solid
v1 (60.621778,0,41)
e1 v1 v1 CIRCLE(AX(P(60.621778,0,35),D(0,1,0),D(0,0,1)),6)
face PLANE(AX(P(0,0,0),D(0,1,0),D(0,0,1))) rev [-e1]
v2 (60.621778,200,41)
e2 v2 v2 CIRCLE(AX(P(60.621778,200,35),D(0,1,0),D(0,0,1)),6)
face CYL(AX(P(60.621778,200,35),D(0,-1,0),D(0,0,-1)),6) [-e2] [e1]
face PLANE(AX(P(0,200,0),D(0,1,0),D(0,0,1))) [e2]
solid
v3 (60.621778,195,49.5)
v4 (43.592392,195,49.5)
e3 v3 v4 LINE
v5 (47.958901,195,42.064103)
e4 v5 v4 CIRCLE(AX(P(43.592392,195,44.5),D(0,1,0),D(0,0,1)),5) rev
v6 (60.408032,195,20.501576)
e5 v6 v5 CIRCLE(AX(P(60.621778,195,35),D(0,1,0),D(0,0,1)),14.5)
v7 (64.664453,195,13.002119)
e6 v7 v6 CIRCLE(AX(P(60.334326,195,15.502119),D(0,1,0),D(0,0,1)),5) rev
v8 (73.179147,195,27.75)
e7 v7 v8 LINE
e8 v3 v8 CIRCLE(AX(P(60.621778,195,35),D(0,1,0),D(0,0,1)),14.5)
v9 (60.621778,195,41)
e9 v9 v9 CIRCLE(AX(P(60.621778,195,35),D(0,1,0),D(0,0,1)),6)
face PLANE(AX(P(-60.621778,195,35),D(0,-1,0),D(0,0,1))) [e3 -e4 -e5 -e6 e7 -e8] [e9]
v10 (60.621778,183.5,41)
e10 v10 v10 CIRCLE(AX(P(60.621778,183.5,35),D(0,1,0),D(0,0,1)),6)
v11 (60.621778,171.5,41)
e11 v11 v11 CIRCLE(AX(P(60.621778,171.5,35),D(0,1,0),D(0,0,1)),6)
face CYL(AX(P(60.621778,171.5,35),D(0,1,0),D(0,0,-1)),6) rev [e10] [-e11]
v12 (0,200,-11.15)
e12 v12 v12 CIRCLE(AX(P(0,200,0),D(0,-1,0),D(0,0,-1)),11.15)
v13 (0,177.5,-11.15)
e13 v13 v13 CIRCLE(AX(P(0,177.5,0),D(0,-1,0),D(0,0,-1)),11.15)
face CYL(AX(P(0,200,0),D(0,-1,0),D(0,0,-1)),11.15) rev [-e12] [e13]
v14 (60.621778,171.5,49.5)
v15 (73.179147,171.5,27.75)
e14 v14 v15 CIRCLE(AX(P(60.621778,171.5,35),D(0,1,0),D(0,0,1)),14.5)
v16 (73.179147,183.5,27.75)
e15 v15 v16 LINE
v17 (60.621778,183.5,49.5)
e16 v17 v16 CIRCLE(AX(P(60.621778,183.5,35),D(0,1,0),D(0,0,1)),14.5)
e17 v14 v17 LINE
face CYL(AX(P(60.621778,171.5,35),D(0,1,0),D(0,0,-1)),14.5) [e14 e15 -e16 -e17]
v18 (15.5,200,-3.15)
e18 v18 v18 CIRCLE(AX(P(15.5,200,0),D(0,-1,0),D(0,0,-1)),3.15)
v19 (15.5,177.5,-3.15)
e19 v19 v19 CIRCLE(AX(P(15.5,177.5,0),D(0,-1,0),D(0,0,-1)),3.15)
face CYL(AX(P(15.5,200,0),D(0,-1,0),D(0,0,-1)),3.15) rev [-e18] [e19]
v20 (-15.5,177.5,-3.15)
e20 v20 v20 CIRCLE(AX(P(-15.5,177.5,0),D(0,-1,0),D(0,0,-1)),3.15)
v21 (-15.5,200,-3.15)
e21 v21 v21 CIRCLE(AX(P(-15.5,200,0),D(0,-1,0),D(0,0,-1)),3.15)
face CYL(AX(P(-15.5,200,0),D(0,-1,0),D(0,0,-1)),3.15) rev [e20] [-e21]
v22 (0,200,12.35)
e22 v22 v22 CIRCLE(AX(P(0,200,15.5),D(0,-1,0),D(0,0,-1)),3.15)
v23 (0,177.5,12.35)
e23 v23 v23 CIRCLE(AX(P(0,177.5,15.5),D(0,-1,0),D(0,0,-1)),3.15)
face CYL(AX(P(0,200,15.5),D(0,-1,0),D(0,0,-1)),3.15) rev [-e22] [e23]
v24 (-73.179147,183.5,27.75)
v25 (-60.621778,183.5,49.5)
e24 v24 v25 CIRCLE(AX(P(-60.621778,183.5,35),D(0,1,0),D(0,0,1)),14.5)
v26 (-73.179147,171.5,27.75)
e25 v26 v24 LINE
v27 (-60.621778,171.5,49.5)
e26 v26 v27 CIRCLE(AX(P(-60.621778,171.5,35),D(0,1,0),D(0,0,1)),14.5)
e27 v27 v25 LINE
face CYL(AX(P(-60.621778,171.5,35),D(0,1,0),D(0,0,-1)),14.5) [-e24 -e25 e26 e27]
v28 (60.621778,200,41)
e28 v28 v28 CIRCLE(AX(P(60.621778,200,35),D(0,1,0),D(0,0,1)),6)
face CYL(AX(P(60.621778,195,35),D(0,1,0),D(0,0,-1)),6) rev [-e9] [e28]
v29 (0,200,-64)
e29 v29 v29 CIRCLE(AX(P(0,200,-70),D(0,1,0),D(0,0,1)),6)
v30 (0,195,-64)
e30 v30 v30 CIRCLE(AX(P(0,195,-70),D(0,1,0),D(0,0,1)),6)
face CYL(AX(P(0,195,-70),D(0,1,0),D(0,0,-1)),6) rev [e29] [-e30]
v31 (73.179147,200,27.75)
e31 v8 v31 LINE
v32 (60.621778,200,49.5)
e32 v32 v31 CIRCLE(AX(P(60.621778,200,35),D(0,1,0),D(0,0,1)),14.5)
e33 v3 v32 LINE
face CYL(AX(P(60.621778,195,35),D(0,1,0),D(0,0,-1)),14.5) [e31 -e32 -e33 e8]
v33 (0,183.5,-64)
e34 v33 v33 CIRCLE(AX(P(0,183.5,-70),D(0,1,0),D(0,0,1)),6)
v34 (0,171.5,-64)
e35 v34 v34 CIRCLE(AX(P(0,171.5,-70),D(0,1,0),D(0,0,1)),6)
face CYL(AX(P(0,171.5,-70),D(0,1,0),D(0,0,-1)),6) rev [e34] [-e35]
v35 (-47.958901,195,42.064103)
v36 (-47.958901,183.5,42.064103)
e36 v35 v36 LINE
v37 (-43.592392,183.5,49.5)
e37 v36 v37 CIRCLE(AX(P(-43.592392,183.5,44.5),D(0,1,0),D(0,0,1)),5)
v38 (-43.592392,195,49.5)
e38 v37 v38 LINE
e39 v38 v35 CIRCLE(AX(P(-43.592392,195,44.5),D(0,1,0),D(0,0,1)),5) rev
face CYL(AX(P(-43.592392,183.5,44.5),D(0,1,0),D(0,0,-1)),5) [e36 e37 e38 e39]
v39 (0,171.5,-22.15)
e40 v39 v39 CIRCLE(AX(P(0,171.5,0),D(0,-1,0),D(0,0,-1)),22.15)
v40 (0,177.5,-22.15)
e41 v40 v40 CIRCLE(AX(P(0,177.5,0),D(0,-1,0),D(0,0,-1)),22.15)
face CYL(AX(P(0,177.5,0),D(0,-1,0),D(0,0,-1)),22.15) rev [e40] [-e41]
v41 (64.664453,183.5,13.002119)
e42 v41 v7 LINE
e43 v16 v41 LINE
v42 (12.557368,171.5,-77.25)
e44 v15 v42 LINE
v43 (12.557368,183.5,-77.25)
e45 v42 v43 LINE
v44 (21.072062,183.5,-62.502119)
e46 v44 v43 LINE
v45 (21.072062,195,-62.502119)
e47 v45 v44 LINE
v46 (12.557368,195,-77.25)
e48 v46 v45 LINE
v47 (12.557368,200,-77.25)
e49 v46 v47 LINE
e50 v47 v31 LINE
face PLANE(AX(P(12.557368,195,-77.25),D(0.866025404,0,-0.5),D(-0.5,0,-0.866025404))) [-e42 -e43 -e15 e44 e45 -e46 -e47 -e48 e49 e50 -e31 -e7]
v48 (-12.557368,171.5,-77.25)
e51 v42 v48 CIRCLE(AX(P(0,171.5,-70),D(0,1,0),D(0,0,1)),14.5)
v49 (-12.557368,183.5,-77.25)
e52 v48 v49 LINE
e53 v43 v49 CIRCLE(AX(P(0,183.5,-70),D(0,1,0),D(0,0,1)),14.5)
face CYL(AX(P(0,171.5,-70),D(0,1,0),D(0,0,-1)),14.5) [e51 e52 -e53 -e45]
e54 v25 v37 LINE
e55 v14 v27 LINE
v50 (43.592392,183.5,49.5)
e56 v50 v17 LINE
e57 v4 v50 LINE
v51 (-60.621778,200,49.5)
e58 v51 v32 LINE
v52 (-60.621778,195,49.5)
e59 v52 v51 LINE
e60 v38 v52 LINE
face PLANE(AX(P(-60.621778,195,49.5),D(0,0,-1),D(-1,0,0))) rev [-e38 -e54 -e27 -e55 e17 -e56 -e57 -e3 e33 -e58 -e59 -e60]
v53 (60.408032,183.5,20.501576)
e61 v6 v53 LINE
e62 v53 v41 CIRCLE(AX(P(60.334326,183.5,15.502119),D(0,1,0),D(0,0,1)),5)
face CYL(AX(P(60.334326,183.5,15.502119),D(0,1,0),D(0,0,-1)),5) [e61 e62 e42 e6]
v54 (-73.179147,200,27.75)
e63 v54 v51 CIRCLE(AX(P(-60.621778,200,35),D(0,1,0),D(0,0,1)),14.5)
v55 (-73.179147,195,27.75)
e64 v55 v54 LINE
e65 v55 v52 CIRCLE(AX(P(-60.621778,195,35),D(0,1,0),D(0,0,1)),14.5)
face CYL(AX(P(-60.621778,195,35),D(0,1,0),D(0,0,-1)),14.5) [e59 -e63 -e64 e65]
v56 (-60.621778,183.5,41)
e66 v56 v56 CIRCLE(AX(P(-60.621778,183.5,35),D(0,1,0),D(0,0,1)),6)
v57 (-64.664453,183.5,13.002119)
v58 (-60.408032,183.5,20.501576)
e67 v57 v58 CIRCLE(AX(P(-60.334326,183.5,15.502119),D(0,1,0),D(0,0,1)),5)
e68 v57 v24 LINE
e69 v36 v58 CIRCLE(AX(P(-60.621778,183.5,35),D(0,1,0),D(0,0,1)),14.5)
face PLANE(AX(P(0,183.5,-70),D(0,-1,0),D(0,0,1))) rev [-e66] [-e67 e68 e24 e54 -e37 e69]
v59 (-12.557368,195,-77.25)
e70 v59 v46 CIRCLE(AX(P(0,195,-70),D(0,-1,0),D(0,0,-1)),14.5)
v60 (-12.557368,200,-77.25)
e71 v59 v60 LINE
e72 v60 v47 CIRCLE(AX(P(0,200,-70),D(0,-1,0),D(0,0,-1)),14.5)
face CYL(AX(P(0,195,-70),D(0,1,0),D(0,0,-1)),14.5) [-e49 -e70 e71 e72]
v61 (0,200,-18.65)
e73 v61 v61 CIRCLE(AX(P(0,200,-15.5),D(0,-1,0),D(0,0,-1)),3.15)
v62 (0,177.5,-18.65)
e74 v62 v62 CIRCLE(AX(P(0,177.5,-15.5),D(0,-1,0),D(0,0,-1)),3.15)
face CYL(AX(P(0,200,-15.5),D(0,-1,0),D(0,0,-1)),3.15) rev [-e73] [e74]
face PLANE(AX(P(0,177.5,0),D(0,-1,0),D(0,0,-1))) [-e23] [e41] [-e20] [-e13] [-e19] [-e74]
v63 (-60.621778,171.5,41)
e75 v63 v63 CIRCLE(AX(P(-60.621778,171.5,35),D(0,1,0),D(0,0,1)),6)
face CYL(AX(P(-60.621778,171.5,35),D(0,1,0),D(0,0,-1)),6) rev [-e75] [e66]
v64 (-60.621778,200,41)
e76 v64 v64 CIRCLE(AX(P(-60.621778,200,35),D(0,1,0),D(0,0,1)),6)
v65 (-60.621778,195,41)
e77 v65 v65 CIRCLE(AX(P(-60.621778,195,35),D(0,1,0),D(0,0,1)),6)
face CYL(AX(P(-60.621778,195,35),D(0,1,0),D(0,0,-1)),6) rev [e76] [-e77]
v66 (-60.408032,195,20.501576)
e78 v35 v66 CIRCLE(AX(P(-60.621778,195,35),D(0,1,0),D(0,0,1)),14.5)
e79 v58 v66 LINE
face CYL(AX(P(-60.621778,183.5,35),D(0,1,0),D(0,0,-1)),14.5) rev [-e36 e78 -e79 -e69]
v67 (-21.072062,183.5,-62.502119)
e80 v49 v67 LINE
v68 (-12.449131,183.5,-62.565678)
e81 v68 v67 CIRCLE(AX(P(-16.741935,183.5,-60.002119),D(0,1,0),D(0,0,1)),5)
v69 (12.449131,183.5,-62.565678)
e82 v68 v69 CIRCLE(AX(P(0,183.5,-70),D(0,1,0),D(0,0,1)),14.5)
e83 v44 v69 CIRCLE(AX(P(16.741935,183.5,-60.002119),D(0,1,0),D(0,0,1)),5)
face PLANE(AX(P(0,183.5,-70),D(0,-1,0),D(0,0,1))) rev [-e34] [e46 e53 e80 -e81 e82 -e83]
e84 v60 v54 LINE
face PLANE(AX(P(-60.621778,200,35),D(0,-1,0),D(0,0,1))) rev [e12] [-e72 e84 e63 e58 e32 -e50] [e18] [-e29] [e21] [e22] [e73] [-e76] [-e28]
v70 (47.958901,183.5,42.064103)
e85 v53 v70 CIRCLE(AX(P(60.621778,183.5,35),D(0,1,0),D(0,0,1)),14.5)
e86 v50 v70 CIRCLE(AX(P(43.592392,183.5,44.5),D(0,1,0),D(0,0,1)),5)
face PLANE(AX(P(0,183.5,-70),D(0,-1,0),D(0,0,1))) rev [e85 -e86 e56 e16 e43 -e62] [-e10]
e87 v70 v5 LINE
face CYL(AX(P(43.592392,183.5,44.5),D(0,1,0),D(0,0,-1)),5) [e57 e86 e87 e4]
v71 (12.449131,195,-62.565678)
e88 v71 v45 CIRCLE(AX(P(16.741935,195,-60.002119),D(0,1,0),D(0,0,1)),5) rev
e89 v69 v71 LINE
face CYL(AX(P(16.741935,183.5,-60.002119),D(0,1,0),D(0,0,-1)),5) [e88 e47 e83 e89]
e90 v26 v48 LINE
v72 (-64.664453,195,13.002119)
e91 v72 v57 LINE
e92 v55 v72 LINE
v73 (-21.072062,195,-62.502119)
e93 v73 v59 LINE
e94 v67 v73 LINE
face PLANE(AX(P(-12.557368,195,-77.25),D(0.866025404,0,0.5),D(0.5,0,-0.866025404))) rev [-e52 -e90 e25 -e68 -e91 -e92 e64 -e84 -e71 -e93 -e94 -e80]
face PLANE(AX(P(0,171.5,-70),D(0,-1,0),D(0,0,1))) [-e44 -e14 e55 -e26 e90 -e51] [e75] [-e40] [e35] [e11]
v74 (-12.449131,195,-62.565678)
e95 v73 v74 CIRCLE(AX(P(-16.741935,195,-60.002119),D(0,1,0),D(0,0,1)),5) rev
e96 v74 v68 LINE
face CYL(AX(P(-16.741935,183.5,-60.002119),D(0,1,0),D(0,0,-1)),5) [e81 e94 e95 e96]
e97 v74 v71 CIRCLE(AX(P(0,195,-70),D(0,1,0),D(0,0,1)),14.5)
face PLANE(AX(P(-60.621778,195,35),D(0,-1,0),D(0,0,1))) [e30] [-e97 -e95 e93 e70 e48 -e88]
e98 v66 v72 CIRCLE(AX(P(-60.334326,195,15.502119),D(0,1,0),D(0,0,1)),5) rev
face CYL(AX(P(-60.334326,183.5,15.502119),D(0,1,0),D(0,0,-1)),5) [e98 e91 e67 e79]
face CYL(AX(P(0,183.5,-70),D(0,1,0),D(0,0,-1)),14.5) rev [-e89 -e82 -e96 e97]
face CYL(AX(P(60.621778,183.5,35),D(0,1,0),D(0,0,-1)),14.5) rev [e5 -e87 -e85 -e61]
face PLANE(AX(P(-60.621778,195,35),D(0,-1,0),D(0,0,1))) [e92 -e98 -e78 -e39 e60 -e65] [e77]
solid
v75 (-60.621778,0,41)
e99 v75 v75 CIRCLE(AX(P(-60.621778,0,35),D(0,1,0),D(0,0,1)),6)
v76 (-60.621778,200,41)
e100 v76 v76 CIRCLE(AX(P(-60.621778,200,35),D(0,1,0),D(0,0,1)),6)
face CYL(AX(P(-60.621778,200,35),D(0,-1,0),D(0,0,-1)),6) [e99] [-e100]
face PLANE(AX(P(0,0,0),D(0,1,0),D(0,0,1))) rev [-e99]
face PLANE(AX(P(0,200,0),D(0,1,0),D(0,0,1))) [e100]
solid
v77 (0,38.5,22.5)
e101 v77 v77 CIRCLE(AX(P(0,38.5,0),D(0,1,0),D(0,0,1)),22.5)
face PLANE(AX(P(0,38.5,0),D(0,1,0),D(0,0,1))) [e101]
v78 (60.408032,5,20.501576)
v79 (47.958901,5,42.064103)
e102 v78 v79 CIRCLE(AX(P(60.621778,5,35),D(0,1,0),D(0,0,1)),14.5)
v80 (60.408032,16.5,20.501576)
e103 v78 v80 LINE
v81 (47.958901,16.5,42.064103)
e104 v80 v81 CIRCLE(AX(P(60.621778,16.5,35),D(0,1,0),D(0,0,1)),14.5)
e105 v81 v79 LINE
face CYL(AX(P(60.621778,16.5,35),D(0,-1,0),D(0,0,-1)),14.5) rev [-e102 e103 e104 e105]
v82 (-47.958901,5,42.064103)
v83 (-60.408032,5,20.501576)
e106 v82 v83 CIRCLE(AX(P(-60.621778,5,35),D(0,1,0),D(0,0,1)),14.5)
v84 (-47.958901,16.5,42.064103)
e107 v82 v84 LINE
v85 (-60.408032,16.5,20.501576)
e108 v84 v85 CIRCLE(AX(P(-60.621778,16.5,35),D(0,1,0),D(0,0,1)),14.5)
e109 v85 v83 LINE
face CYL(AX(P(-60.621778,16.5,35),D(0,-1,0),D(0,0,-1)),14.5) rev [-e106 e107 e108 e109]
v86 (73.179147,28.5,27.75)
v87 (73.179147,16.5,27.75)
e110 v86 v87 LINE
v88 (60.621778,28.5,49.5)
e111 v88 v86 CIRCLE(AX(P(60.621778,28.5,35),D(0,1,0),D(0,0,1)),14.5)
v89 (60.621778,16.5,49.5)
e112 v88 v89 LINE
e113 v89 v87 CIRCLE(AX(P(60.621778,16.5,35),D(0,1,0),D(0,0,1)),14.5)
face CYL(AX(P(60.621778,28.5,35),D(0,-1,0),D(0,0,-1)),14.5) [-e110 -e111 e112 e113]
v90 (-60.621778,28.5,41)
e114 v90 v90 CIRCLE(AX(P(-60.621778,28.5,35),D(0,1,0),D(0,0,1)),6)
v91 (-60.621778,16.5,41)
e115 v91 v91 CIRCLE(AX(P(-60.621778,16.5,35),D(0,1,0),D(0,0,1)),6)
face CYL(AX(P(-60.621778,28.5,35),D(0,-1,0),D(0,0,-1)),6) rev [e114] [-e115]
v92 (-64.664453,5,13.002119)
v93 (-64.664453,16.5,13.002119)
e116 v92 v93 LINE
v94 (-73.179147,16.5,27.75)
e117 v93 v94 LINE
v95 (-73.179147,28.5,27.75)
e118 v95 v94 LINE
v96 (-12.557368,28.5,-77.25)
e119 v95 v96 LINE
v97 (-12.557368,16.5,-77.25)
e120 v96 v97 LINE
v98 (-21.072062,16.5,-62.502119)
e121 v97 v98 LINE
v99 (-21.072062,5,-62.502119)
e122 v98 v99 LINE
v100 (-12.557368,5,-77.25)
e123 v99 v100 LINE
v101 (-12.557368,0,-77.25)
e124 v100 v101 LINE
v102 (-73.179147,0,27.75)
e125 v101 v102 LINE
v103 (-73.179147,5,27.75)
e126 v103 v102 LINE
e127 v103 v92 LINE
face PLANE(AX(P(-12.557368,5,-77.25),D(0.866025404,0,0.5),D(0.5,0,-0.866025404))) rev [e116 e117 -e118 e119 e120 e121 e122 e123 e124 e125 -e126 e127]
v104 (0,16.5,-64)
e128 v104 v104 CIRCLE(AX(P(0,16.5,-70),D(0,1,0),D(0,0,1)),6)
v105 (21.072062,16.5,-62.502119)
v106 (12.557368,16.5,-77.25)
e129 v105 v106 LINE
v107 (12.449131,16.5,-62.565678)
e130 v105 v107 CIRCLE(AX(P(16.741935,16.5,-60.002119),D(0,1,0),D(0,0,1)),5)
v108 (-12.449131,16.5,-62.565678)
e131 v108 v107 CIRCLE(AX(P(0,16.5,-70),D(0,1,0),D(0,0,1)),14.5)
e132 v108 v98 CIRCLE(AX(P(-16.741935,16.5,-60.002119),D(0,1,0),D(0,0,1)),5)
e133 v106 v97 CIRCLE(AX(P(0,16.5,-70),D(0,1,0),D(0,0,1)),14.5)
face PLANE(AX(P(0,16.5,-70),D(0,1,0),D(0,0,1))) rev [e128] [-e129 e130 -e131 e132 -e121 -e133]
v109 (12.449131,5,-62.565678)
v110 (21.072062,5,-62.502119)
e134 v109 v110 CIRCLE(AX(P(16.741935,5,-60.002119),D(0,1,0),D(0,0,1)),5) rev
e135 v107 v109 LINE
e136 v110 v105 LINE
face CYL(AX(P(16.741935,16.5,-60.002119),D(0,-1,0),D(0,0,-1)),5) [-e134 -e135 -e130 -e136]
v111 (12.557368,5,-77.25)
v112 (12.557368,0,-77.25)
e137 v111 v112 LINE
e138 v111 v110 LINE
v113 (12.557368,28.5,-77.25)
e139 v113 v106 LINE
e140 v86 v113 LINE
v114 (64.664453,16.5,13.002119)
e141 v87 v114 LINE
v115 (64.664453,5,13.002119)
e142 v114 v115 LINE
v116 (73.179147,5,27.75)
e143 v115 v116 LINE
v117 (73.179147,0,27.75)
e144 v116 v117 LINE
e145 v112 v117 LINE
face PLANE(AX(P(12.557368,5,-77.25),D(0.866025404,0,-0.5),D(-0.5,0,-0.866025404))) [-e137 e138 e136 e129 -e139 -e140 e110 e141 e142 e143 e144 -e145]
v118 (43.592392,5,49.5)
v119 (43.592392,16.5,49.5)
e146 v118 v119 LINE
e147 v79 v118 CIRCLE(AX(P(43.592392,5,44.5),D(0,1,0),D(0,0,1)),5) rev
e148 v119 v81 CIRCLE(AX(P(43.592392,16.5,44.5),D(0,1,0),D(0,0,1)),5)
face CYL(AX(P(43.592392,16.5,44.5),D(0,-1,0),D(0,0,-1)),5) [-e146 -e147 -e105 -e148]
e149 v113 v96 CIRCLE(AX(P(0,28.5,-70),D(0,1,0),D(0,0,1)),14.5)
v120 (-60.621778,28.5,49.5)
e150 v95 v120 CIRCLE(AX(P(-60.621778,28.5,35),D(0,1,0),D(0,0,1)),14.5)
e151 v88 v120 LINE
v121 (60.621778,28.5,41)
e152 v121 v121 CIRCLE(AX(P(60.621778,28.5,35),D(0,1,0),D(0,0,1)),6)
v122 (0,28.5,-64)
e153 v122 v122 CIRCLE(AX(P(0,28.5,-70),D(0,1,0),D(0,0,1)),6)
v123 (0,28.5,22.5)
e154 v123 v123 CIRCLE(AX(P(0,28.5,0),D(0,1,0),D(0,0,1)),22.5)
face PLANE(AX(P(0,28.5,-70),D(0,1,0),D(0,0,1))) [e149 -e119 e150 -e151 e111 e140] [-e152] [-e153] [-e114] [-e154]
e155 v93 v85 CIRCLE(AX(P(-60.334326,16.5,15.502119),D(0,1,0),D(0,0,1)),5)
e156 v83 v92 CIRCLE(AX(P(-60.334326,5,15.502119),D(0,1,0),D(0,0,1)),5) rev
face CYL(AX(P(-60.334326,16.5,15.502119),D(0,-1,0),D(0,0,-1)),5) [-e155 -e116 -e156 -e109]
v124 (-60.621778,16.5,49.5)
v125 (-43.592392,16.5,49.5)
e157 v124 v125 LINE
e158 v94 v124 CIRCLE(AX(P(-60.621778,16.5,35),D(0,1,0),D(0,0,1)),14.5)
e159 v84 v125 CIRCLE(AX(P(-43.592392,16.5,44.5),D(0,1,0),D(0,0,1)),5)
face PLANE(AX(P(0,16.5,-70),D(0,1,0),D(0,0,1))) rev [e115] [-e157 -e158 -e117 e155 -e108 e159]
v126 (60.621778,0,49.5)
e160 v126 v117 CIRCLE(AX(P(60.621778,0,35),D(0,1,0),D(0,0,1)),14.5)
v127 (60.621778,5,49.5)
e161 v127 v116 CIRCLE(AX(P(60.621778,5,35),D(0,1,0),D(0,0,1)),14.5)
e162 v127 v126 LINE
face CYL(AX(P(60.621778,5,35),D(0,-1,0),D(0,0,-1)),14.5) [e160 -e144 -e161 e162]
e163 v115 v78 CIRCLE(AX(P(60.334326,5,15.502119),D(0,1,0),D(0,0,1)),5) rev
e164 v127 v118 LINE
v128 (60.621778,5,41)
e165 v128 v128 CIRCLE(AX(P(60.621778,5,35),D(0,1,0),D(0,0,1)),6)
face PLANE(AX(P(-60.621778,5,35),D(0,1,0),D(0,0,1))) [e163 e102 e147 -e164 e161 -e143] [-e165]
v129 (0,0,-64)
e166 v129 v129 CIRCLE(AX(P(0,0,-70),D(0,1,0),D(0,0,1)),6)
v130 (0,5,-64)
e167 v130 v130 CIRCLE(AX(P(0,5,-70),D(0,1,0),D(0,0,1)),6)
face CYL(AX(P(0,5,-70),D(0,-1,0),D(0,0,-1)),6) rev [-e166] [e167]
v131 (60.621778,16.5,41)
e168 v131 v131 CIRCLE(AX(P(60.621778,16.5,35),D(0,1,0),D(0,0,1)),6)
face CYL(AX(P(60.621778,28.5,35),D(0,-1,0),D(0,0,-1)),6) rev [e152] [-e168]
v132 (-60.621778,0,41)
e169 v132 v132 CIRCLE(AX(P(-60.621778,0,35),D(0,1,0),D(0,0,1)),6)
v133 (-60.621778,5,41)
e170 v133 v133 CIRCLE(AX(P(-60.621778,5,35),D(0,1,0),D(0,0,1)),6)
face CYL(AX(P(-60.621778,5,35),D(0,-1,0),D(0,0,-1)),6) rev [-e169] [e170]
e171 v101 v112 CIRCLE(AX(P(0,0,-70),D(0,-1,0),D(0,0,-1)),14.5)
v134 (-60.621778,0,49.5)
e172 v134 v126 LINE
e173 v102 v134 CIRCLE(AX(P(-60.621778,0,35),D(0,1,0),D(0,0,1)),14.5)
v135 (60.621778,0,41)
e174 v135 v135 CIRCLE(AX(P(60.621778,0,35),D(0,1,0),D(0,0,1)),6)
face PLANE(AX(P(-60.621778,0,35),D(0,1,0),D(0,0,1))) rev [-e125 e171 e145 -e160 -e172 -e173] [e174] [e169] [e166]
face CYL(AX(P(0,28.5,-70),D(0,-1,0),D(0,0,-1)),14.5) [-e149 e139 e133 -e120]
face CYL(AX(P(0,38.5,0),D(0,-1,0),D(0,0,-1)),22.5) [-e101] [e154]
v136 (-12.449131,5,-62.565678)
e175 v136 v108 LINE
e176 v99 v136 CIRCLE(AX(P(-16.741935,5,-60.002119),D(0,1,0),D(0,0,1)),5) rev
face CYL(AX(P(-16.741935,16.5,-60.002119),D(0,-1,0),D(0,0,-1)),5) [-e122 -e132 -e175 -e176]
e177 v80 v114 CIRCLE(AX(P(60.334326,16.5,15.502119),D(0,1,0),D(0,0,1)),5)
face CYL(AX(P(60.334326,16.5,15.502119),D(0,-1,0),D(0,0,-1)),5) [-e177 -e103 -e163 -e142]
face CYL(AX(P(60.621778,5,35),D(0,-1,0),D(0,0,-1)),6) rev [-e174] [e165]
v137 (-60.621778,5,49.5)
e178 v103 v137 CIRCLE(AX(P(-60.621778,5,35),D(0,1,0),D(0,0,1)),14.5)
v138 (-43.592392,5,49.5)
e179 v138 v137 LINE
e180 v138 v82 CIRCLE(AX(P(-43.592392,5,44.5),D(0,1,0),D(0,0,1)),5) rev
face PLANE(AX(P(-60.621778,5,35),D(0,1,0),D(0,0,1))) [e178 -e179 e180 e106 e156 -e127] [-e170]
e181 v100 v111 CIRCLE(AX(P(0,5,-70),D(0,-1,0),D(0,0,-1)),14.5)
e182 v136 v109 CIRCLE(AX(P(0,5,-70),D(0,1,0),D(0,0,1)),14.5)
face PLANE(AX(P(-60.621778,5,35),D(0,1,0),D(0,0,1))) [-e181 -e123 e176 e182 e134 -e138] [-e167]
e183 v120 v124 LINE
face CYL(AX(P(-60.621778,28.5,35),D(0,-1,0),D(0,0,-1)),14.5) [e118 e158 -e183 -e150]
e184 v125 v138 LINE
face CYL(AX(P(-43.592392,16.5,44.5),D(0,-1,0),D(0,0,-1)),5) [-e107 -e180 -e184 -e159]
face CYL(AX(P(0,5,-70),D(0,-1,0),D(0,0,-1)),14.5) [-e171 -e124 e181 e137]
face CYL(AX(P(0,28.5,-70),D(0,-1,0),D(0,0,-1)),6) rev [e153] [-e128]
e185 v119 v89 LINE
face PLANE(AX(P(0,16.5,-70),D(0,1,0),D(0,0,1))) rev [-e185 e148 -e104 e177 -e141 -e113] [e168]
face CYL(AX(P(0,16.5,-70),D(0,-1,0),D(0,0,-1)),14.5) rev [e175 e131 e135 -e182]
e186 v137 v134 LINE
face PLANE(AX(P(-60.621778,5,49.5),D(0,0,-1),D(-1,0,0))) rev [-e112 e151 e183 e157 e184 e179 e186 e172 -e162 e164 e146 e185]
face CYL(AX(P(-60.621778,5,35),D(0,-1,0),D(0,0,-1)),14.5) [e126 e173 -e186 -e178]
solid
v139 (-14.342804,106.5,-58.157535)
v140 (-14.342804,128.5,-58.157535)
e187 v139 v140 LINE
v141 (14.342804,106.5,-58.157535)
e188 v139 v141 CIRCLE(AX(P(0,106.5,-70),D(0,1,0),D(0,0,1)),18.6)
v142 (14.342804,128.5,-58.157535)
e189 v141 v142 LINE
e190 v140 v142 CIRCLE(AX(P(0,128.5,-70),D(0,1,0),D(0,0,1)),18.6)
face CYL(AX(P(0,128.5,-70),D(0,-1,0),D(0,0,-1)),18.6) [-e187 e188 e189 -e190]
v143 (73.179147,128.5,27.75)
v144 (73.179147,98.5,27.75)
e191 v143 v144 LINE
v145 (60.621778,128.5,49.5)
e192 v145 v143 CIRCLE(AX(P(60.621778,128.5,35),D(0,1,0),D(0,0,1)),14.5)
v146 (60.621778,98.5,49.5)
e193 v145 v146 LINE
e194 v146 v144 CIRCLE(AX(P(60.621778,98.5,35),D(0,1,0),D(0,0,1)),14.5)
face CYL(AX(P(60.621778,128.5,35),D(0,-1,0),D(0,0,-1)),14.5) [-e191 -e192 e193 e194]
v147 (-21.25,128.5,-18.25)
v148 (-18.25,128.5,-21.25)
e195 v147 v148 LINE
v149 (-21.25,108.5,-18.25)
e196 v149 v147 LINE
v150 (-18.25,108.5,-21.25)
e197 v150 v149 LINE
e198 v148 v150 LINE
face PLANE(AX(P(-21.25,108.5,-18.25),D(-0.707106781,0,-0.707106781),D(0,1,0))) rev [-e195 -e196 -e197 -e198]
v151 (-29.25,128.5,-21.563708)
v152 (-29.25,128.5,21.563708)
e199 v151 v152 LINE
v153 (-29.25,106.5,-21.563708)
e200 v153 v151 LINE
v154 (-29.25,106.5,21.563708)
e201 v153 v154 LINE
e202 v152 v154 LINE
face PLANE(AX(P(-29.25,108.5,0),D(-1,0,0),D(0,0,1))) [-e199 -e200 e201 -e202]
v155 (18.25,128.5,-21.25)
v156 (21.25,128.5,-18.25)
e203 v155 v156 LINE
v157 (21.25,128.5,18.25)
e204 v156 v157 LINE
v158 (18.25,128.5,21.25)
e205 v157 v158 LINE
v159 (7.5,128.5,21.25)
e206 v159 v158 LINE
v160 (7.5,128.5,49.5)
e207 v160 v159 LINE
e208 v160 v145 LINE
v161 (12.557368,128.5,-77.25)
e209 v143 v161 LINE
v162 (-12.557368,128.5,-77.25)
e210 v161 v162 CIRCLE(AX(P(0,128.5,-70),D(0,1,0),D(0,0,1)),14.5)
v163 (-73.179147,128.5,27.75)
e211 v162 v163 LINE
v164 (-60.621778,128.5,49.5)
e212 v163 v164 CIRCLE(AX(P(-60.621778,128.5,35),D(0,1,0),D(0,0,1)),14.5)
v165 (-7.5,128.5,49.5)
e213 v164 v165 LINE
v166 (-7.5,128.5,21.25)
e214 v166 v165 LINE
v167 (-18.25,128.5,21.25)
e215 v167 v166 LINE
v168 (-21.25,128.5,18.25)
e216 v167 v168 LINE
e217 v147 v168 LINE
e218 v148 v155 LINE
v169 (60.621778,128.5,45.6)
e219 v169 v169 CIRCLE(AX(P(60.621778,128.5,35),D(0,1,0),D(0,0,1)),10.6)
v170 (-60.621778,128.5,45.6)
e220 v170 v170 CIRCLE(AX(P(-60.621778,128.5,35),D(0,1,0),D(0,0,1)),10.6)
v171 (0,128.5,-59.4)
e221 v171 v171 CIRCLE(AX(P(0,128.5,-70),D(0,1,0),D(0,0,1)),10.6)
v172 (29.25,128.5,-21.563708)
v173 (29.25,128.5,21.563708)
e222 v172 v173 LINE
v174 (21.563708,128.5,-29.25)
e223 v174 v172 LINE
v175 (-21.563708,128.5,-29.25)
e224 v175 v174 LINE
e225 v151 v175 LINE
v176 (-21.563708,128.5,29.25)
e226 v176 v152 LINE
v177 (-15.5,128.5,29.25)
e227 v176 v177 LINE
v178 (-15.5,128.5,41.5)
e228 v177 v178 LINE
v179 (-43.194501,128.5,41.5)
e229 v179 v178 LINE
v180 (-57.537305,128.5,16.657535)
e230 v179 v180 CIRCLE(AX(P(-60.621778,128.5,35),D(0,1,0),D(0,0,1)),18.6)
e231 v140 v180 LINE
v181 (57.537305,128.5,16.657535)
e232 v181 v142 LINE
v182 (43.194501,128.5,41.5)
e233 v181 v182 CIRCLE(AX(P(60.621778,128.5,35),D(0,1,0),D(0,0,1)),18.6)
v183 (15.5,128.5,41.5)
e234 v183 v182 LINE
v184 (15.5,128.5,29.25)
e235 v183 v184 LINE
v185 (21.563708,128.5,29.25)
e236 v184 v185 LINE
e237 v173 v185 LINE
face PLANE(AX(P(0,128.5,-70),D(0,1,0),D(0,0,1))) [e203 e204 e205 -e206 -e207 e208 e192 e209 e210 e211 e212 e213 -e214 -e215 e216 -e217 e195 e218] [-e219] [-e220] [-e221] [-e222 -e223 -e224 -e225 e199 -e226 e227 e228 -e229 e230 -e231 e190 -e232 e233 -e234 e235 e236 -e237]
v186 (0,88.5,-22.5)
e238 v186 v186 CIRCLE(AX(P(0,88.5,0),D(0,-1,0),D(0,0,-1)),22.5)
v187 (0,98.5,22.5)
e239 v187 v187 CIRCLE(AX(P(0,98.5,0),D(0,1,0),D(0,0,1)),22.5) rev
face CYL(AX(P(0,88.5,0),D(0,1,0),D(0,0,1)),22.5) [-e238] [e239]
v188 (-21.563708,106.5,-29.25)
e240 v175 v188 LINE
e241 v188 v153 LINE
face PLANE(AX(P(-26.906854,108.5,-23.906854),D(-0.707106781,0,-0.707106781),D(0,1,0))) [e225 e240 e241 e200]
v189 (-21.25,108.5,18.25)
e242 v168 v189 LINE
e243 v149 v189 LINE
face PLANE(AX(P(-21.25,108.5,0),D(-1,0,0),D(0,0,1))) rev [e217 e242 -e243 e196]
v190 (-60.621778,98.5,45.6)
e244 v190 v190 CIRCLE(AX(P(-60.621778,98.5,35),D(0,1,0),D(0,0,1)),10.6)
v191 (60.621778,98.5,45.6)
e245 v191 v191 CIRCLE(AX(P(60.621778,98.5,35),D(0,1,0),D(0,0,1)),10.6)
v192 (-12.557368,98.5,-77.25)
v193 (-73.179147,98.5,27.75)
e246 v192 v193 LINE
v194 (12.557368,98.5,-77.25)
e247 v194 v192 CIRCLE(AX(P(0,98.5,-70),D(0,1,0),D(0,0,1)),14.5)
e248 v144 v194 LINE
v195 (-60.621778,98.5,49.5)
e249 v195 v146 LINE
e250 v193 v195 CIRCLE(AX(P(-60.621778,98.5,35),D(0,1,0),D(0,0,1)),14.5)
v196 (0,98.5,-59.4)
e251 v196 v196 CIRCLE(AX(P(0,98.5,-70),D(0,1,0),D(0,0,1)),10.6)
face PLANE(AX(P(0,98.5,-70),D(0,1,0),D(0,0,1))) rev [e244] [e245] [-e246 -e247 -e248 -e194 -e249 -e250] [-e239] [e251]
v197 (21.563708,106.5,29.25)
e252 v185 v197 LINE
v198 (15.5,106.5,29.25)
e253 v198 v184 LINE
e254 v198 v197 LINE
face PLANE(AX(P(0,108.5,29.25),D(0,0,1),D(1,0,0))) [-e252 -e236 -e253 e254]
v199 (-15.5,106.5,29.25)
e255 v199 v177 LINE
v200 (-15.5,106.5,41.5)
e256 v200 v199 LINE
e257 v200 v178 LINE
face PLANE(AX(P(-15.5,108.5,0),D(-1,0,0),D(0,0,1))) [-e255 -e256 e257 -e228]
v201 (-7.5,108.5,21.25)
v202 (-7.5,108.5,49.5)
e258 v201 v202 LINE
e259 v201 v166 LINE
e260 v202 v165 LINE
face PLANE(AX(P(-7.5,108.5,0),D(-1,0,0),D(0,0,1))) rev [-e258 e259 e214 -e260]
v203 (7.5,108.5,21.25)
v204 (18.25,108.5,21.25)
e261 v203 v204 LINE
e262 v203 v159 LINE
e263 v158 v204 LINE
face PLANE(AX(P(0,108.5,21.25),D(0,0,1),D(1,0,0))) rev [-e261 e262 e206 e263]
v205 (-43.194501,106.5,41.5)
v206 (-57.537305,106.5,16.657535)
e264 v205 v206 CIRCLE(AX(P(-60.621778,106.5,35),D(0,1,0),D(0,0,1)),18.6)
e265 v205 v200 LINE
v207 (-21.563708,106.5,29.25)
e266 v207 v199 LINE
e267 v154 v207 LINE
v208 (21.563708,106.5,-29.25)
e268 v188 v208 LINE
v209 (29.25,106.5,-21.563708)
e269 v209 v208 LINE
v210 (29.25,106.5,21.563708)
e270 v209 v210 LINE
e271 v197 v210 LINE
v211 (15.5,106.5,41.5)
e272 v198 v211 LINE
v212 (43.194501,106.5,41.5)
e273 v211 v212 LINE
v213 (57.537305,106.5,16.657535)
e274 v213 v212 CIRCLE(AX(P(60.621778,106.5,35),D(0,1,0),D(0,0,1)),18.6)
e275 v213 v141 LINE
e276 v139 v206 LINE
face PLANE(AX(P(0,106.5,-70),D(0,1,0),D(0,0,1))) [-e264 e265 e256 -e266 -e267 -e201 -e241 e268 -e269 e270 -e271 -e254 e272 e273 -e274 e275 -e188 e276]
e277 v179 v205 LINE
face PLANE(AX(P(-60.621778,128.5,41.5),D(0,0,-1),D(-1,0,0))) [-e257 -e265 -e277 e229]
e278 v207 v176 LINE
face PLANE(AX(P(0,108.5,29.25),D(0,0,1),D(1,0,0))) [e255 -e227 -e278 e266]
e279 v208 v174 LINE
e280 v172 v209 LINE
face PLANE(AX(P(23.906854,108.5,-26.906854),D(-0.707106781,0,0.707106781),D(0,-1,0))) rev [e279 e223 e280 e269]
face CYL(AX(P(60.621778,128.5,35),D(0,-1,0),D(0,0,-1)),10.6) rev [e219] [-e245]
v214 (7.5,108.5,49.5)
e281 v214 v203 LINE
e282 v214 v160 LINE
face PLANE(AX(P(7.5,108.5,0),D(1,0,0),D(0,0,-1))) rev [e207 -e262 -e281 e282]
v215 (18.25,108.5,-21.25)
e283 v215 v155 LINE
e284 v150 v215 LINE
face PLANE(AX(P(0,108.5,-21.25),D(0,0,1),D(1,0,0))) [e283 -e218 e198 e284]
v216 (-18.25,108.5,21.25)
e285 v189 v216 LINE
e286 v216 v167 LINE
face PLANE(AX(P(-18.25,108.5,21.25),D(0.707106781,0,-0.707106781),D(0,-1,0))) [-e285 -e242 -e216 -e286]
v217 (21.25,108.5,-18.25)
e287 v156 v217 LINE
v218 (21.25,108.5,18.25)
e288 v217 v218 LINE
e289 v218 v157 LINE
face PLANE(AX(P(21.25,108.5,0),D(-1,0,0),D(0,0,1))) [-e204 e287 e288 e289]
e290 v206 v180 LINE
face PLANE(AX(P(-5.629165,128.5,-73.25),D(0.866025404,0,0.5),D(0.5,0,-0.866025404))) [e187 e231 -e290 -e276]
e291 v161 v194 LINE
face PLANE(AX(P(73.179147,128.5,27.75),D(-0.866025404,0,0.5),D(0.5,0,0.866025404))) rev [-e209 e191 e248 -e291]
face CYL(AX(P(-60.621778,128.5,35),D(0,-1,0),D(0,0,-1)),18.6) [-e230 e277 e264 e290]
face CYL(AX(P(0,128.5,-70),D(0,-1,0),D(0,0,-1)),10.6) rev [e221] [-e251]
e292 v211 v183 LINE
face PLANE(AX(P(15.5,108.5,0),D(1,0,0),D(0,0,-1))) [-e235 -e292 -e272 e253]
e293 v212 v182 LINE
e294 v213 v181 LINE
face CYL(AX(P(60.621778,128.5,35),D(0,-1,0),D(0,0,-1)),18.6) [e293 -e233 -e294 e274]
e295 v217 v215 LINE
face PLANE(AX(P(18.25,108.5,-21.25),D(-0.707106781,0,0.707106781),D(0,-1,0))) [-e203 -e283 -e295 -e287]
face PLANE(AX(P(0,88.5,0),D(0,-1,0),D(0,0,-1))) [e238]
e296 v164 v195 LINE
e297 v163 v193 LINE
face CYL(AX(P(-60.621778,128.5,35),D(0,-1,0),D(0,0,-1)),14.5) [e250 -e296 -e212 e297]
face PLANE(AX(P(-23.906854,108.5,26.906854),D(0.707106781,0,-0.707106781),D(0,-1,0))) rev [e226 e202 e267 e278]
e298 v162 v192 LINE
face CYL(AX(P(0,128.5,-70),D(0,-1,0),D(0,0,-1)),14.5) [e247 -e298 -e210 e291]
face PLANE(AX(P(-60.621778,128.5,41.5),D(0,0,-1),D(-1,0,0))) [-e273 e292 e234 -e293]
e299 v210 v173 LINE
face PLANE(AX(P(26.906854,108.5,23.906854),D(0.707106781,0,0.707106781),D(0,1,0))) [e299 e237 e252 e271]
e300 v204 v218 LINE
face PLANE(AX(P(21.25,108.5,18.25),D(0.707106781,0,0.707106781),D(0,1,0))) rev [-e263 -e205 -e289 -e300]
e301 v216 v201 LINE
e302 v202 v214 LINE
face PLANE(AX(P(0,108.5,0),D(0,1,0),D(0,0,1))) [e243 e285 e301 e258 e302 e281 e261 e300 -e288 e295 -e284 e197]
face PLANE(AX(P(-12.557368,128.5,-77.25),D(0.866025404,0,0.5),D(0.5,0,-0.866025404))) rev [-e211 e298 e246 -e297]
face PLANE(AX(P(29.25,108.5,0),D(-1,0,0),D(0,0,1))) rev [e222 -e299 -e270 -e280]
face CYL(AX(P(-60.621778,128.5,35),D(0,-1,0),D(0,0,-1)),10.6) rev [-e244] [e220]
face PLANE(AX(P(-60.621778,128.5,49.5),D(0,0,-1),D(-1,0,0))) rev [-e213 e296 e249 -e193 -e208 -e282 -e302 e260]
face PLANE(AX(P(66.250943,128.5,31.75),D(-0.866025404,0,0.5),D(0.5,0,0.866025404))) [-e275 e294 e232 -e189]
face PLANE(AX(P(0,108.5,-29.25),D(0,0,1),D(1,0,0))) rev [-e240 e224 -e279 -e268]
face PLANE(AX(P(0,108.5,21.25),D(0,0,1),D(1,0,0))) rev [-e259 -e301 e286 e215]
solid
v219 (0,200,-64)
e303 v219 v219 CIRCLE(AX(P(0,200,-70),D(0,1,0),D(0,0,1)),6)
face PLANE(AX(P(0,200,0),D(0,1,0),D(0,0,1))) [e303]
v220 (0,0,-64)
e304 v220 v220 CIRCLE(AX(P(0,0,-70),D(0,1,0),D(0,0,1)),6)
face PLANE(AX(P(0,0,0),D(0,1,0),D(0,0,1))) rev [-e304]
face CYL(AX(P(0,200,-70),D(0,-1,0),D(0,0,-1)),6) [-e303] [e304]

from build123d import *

# Parameters (mm, degrees)
SKETCH1_R             = 6
BOSS_EXTRUDE1_DEPTH   = 5
BOSS_EXTRUDE2_START   = 5
BOSS_EXTRUDE2_DEPTH   = 11.5
BOSS_EXTRUDE6_START   = 16.5
SKETCH1_5_R           = 6
BOSS_EXTRUDE6_DEPTH   = 12
SKETCH1_3_R           = 6
BOSS_EXTRUDE3_DEPTH   = 200
BOSS_EXTRUDE3_2_DEPTH = 200
BOSS_EXTRUDE3_3_DEPTH = 200
FILLET1_START         = 5
FILLET1_DEPTH         = 11.5
SKETCH2_R             = 22.5
BOSS_EXTRUDE4_DEPTH   = 10
SKETCH3_R             = 22.15
SKETCH3_R_2           = 11.15
SKETCH3_R_3           = 3.15
CUT_EXTRUDE1_DEPTH    = 6
SKETCH3_2_R           = 3.15
SKETCH3_2_R_2         = 11.15
CUT_EXTRUDE2_DEPTH    = 206.416118086
SKETCH4_R             = 10.6
BOSS_EXTRUDE7_DEPTH   = 30
SKETCH5_W             = 15
SKETCH5_H             = 28.25
CUT_EXTRUDE3_DEPTH    = 20
CHAMFER1_SIZE         = 3
SHELL2_START          = 106.5
SHELL2_DEPTH          = 22
BOSS_EXTRUDE8_START   = 10
SKETCH6_R             = 22.5
BOSS_EXTRUDE8_DEPTH   = 10


with BuildPart() as part:
    # Sketch1 → Boss-Extrude1 (new body)
    with BuildSketch(Plane(origin=(0, 0, 0), x_dir=(1, 0, 0), z_dir=(0, 1, 0))):
        with BuildLine():
            Line((-12.557368355, 77.25), (-73.17914662, -27.75))
            ThreePointArc((-73.17914662, -27.75), (-73.17914662, -42.25), (-60.621778265, -49.5))
            Line((-60.621778265, -49.5), (60.621778265, -49.5))
            ThreePointArc((60.621778265, -49.5), (73.17914662, -42.25), (73.17914662, -27.75))
            Line((73.17914662, -27.75), (12.557368355, 77.25))
            ThreePointArc((12.557368355, 77.25), (0, 84.5), (-12.557368355, 77.25))
        make_face()
        with Locations(Location((0, 70, 0), (0, 0, 270))):
            Circle(SKETCH1_R, mode=Mode.SUBTRACT)
        with Locations(Location((60.621778265, -35, 0), (0, 0, 270))):
            Circle(SKETCH1_R, mode=Mode.SUBTRACT)
        with Locations(Location((-60.621778265, -35, 0), (0, 0, 270))):
            Circle(SKETCH1_R, mode=Mode.SUBTRACT)
    extrude(amount=BOSS_EXTRUDE1_DEPTH)

    # Sketch1<2> → Boss-Extrude2 (add)
    with BuildSketch(Plane(origin=(0, 0, 0), x_dir=(1, 0, 0), z_dir=(0, 1, 0)).offset(BOSS_EXTRUDE2_START)):
        with BuildLine():
            ThreePointArc((14.5, 70), (-3.752876154, 55.994075519), (-12.557368355, 77.25))
            Line((-12.557368355, 77.25), (-73.17914662, -27.75))
            ThreePointArc((-73.17914662, -27.75), (-56.868902111, -20.994075519), (-46.121778265, -35))
            ThreePointArc((-46.121778265, -35), (-50.368729938, -45.253048327), (-60.621778265, -49.5))
            Line((-60.621778265, -49.5), (60.621778265, -49.5))
            ThreePointArc((60.621778265, -49.5), (48.06440991, -27.75), (73.17914662, -27.75))
            Line((73.17914662, -27.75), (12.557368355, 77.25))
            ThreePointArc((12.557368355, 77.25), (14.005924481, 73.752876154), (14.5, 70))
        make_face()
    extrude(amount=BOSS_EXTRUDE2_DEPTH)

    # Sketch1<5> → Boss-Extrude6 (add)
    with BuildSketch(Plane(origin=(0, 0, 0), x_dir=(1, 0, 0), z_dir=(0, 1, 0)).offset(BOSS_EXTRUDE6_START)):
        with BuildLine():
            Line((-12.557368355, 77.25), (-73.17914662, -27.75))
            ThreePointArc((-73.17914662, -27.75), (-73.17914662, -42.25), (-60.621778265, -49.5))
            Line((-60.621778265, -49.5), (60.621778265, -49.5))
            ThreePointArc((60.621778265, -49.5), (73.17914662, -42.25), (73.17914662, -27.75))
            Line((73.17914662, -27.75), (12.557368355, 77.25))
            ThreePointArc((12.557368355, 77.25), (0, 84.5), (-12.557368355, 77.25))
        make_face()
        with Locations(Location((0, 70, 0), (0, 0, 270))):
            Circle(SKETCH1_5_R, mode=Mode.SUBTRACT)
        with Locations(Location((60.621778265, -35, 0), (0, 0, 270))):
            Circle(SKETCH1_5_R, mode=Mode.SUBTRACT)
        with Locations(Location((-60.621778265, -35, 0), (0, 0, 270))):
            Circle(SKETCH1_5_R, mode=Mode.SUBTRACT)
    extrude(amount=BOSS_EXTRUDE6_DEPTH)

    # Fillet1: read off the stored shape, not the designer's step
    # Fillet1 outline → Fillet1 (cut)
    with BuildSketch(Plane(origin=(0, 0, 0), x_dir=(1, 0, 0), z_dir=(0, 1, 0)).offset(FILLET1_START)):
        with BuildLine():
            ThreePointArc((60.621778265, -49.5), (53.279417854, -47.503589228), (47.958901224, -42.064102564))
            ThreePointArc((47.958901224, -42.064102564), (47.903974391, -47.031848418), (43.592391899, -49.5))
            Line((43.592391899, -49.5), (60.621778265, -49.5))
        make_face()
        with BuildLine():
            ThreePointArc((64.664453437, -13.002118796), (64.682762712, -17.970134556), (60.40803202, -20.501575515))
            ThreePointArc((60.40803202, -20.501575515), (67.77902397, -22.389534746), (73.17914662, -27.75))
            Line((73.17914662, -27.75), (64.664453437, -13.002118796))
        make_face()
        with BuildLine():
            Line((-60.621778265, -49.5), (-43.592391899, -49.5))
            ThreePointArc((-43.592391899, -49.5), (-47.903974391, -47.031848418), (-47.958901224, -42.064102564))
            ThreePointArc((-47.958901224, -42.064102564), (-53.279417854, -47.503589228), (-60.621778265, -49.5))
        make_face()
        with BuildLine():
            ThreePointArc((12.449130796, 62.565678079), (16.778788321, 65.001982974), (21.072061538, 62.502118796))
            Line((21.072061538, 62.502118796), (12.557368355, 77.25))
            ThreePointArc((12.557368355, 77.25), (14.499606116, 69.893123974), (12.449130796, 62.565678079))
        make_face()
        with BuildLine():
            ThreePointArc((-73.17914662, -27.75), (-67.77902397, -22.389534746), (-60.40803202, -20.501575515))
            ThreePointArc((-60.40803202, -20.501575515), (-64.682762712, -17.970134556), (-64.664453437, -13.002118796))
            Line((-64.664453437, -13.002118796), (-73.17914662, -27.75))
        make_face()
        with BuildLine():
            ThreePointArc((-21.072061538, 62.502118796), (-16.778788321, 65.001982974), (-12.449130796, 62.565678079))
            ThreePointArc((-12.449130796, 62.565678079), (-14.499606116, 69.893123974), (-12.557368355, 77.25))
            Line((-12.557368355, 77.25), (-21.072061538, 62.502118796))
        make_face()
    extrude(amount=FILLET1_DEPTH, mode=Mode.SUBTRACT)


with BuildPart() as body_2:
    # Sketch1<3> → Boss-Extrude3 (new body)
    with BuildSketch(Plane(origin=(0, 0, 0), x_dir=(1, 0, 0), z_dir=(0, 1, 0))):
        with Locations(Location((0, 70, 0), (0, 0, 270))):
            Circle(SKETCH1_3_R)
    extrude(amount=BOSS_EXTRUDE3_DEPTH)


with BuildPart() as body_3:
    # Sketch1<3> → Boss-Extrude3 2 (new body)
    with BuildSketch(Plane(origin=(0, 0, 0), x_dir=(1, 0, 0), z_dir=(0, 1, 0))):
        with Locations(Location((60.621778265, -35, 0), (0, 0, 270))):
            Circle(SKETCH1_3_R)
    extrude(amount=BOSS_EXTRUDE3_2_DEPTH)


with BuildPart() as body_4:
    # Sketch1<3> → Boss-Extrude3 3 (new body)
    with BuildSketch(Plane(origin=(0, 0, 0), x_dir=(1, 0, 0), z_dir=(0, 1, 0))):
        with Locations(Location((-60.621778265, -35, 0), (0, 0, 270))):
            Circle(SKETCH1_3_R)
    extrude(amount=BOSS_EXTRUDE3_3_DEPTH)


with BuildPart() as body_5:
    # Mirror1: mirrored copy
    add(part.part.mirror(Plane.ZX.offset(100)))

    # Sketch3 → Cut-Extrude1 (cut)
    with BuildSketch(Plane.XZ.offset(-171.5)):
        with Locations(Location((0, 0, 0), (0, 0, 270))):
            Circle(SKETCH3_R)
        with Locations(Location((0, 0, 0), (0, 0, 270))):
            Circle(SKETCH3_R_2, mode=Mode.SUBTRACT)
        with Locations(Location((0, 15.5, 0), (0, 0, 270))):
            Circle(SKETCH3_R_3, mode=Mode.SUBTRACT)
        with Locations(Location((15.5, 0, 0), (0, 0, 270))):
            Circle(SKETCH3_R_3, mode=Mode.SUBTRACT)
        with Locations(Location((0, -15.5, 0), (0, 0, 270))):
            Circle(SKETCH3_R_3, mode=Mode.SUBTRACT)
        with Locations(Location((-15.5, 0, 0), (0, 0, 270))):
            Circle(SKETCH3_R_3, mode=Mode.SUBTRACT)
    extrude(amount=-CUT_EXTRUDE1_DEPTH, mode=Mode.SUBTRACT)

    # Sketch3<2> → Cut-Extrude2 (cut, through all)
    with BuildSketch(Plane.XZ.offset(-171.5)):
        with Locations(Location((-15.5, 0, 0), (0, 0, 270))):
            Circle(SKETCH3_2_R)
        with Locations(Location((0, -15.5, 0), (0, 0, 270))):
            Circle(SKETCH3_2_R)
        with Locations(Location((15.5, 0, 0), (0, 0, 270))):
            Circle(SKETCH3_2_R)
        with Locations(Location((0, 0, 0), (0, 0, 270))):
            Circle(SKETCH3_2_R_2)
        with Locations(Location((0, 15.5, 0), (0, 0, 270))):
            Circle(SKETCH3_2_R)
    extrude(amount=-CUT_EXTRUDE2_DEPTH, mode=Mode.SUBTRACT)


with BuildPart() as part_1:
    add(part.part)

    # Sketch2 → Boss-Extrude4 (add)
    with BuildSketch(Plane(origin=(0, 28.5, 0), x_dir=(1, 0, 0), z_dir=(0, 1, 0))):
        with Locations(Location((0, 0, 0), (0, 0, 270))):
            Circle(SKETCH2_R)
    extrude(amount=BOSS_EXTRUDE4_DEPTH)


with BuildPart() as body_6:
    # Sketch4 → Boss-Extrude7 (new body)
    with BuildSketch(Plane(origin=(0, 98.5, 0), x_dir=(1, 0, 0), z_dir=(0, 1, 0))):
        with BuildLine():
            Line((-12.557368355, 77.25), (-73.17914662, -27.75))
            ThreePointArc((-73.17914662, -27.75), (-73.17914662, -42.25), (-60.621778265, -49.5))
            Line((-60.621778265, -49.5), (60.621778265, -49.5))
            ThreePointArc((60.621778265, -49.5), (73.17914662, -42.25), (73.17914662, -27.75))
            Line((73.17914662, -27.75), (12.557368355, 77.25))
            ThreePointArc((12.557368355, 77.25), (0, 84.5), (-12.557368355, 77.25))
        make_face()
        with Locations(Location((0, 70, 0), (0, 0, 270))):
            Circle(SKETCH4_R, mode=Mode.SUBTRACT)
        with Locations(Location((-60.621778265, -35, 0), (0, 0, 270))):
            Circle(SKETCH4_R, mode=Mode.SUBTRACT)
        with Locations(Location((60.621778265, -35, 0), (0, 0, 270))):
            Circle(SKETCH4_R, mode=Mode.SUBTRACT)
    extrude(amount=BOSS_EXTRUDE7_DEPTH)

    # Sketch5 → Cut-Extrude3 (cut)
    with BuildSketch(Plane(origin=(0, 128.5, 0), x_dir=(1, 0, 0), z_dir=(0, 1, 0))):
        Polygon((-21.25, -21.25), (21.25, -21.25), (-21.25, 21.25), align=None)
        Polygon((21.25, -21.25), (-21.25, 21.25), (21.25, 21.25), align=None)
        with Locations((0, -35.375)):
            Rectangle(SKETCH5_W, SKETCH5_H)
    extrude(amount=-CUT_EXTRUDE3_DEPTH, mode=Mode.SUBTRACT)

    # Chamfer1
    chamfer1_edges = [body_6.edges().sort_by_distance(p)[0] for p in [
        (-21.25, 118.5, 21.25),
        (-21.25, 118.5, -21.25),
        (21.25, 118.5, -21.25),
        (21.25, 118.5, 21.25),
    ]]
    chamfer(chamfer1_edges, length=CHAMFER1_SIZE)

    # Shell2: read off the stored shape, not the designer's step
    # Shell2 outline → Shell2 (cut)
    with BuildSketch(Plane(origin=(0, 0, 0), x_dir=(1, 0, 0), z_dir=(0, 1, 0)).offset(SHELL2_START)):
        with BuildLine():
            Line((-21.563708499, 29.25), (21.563708499, 29.25))
            Line((21.563708499, 29.25), (29.25, 21.563708499))
            Line((29.25, 21.563708499), (29.25, -21.563708499))
            Line((29.25, -21.563708499), (21.563708499, -29.25))
            Line((21.563708499, -29.25), (15.5, -29.25))
            Line((15.5, -29.25), (15.5, -41.5))
            Line((15.5, -41.5), (43.194500795, -41.5))
            ThreePointArc((43.194500795, -41.5), (44.513705755, -25.7), (57.537304655, -16.657534993))
            Line((57.537304655, -16.657534993), (14.342803859, 58.157534993))
            ThreePointArc((14.342803859, 58.157534993), (0, 51.4), (-14.342803859, 58.157534993))
            Line((-14.342803859, 58.157534993), (-57.537304655, -16.657534993))
            ThreePointArc((-57.537304655, -16.657534993), (-44.513705755, -25.7), (-43.194500795, -41.5))
            Line((-43.194500795, -41.5), (-15.5, -41.5))
            Line((-15.5, -41.5), (-15.5, -29.25))
            Line((-15.5, -29.25), (-21.563708499, -29.25))
            Line((-21.563708499, -29.25), (-29.25, -21.563708499))
            Line((-29.25, -21.563708499), (-29.25, 21.563708499))
            Line((-29.25, 21.563708499), (-21.563708499, 29.25))
        make_face()
    extrude(amount=SHELL2_DEPTH, mode=Mode.SUBTRACT)

    # Sketch6 → Boss-Extrude8 (add)
    with BuildSketch(Plane.XZ.offset(-98.5).offset(BOSS_EXTRUDE8_START)):
        with Locations(Location((0, 0, 0), (0, 0, 90))):
            Circle(SKETCH6_R)
    extrude(amount=-BOSS_EXTRUDE8_DEPTH)


solid = Compound([body_2.part, body_3.part, body_4.part, body_5.part, part_1.part, body_6.part])
